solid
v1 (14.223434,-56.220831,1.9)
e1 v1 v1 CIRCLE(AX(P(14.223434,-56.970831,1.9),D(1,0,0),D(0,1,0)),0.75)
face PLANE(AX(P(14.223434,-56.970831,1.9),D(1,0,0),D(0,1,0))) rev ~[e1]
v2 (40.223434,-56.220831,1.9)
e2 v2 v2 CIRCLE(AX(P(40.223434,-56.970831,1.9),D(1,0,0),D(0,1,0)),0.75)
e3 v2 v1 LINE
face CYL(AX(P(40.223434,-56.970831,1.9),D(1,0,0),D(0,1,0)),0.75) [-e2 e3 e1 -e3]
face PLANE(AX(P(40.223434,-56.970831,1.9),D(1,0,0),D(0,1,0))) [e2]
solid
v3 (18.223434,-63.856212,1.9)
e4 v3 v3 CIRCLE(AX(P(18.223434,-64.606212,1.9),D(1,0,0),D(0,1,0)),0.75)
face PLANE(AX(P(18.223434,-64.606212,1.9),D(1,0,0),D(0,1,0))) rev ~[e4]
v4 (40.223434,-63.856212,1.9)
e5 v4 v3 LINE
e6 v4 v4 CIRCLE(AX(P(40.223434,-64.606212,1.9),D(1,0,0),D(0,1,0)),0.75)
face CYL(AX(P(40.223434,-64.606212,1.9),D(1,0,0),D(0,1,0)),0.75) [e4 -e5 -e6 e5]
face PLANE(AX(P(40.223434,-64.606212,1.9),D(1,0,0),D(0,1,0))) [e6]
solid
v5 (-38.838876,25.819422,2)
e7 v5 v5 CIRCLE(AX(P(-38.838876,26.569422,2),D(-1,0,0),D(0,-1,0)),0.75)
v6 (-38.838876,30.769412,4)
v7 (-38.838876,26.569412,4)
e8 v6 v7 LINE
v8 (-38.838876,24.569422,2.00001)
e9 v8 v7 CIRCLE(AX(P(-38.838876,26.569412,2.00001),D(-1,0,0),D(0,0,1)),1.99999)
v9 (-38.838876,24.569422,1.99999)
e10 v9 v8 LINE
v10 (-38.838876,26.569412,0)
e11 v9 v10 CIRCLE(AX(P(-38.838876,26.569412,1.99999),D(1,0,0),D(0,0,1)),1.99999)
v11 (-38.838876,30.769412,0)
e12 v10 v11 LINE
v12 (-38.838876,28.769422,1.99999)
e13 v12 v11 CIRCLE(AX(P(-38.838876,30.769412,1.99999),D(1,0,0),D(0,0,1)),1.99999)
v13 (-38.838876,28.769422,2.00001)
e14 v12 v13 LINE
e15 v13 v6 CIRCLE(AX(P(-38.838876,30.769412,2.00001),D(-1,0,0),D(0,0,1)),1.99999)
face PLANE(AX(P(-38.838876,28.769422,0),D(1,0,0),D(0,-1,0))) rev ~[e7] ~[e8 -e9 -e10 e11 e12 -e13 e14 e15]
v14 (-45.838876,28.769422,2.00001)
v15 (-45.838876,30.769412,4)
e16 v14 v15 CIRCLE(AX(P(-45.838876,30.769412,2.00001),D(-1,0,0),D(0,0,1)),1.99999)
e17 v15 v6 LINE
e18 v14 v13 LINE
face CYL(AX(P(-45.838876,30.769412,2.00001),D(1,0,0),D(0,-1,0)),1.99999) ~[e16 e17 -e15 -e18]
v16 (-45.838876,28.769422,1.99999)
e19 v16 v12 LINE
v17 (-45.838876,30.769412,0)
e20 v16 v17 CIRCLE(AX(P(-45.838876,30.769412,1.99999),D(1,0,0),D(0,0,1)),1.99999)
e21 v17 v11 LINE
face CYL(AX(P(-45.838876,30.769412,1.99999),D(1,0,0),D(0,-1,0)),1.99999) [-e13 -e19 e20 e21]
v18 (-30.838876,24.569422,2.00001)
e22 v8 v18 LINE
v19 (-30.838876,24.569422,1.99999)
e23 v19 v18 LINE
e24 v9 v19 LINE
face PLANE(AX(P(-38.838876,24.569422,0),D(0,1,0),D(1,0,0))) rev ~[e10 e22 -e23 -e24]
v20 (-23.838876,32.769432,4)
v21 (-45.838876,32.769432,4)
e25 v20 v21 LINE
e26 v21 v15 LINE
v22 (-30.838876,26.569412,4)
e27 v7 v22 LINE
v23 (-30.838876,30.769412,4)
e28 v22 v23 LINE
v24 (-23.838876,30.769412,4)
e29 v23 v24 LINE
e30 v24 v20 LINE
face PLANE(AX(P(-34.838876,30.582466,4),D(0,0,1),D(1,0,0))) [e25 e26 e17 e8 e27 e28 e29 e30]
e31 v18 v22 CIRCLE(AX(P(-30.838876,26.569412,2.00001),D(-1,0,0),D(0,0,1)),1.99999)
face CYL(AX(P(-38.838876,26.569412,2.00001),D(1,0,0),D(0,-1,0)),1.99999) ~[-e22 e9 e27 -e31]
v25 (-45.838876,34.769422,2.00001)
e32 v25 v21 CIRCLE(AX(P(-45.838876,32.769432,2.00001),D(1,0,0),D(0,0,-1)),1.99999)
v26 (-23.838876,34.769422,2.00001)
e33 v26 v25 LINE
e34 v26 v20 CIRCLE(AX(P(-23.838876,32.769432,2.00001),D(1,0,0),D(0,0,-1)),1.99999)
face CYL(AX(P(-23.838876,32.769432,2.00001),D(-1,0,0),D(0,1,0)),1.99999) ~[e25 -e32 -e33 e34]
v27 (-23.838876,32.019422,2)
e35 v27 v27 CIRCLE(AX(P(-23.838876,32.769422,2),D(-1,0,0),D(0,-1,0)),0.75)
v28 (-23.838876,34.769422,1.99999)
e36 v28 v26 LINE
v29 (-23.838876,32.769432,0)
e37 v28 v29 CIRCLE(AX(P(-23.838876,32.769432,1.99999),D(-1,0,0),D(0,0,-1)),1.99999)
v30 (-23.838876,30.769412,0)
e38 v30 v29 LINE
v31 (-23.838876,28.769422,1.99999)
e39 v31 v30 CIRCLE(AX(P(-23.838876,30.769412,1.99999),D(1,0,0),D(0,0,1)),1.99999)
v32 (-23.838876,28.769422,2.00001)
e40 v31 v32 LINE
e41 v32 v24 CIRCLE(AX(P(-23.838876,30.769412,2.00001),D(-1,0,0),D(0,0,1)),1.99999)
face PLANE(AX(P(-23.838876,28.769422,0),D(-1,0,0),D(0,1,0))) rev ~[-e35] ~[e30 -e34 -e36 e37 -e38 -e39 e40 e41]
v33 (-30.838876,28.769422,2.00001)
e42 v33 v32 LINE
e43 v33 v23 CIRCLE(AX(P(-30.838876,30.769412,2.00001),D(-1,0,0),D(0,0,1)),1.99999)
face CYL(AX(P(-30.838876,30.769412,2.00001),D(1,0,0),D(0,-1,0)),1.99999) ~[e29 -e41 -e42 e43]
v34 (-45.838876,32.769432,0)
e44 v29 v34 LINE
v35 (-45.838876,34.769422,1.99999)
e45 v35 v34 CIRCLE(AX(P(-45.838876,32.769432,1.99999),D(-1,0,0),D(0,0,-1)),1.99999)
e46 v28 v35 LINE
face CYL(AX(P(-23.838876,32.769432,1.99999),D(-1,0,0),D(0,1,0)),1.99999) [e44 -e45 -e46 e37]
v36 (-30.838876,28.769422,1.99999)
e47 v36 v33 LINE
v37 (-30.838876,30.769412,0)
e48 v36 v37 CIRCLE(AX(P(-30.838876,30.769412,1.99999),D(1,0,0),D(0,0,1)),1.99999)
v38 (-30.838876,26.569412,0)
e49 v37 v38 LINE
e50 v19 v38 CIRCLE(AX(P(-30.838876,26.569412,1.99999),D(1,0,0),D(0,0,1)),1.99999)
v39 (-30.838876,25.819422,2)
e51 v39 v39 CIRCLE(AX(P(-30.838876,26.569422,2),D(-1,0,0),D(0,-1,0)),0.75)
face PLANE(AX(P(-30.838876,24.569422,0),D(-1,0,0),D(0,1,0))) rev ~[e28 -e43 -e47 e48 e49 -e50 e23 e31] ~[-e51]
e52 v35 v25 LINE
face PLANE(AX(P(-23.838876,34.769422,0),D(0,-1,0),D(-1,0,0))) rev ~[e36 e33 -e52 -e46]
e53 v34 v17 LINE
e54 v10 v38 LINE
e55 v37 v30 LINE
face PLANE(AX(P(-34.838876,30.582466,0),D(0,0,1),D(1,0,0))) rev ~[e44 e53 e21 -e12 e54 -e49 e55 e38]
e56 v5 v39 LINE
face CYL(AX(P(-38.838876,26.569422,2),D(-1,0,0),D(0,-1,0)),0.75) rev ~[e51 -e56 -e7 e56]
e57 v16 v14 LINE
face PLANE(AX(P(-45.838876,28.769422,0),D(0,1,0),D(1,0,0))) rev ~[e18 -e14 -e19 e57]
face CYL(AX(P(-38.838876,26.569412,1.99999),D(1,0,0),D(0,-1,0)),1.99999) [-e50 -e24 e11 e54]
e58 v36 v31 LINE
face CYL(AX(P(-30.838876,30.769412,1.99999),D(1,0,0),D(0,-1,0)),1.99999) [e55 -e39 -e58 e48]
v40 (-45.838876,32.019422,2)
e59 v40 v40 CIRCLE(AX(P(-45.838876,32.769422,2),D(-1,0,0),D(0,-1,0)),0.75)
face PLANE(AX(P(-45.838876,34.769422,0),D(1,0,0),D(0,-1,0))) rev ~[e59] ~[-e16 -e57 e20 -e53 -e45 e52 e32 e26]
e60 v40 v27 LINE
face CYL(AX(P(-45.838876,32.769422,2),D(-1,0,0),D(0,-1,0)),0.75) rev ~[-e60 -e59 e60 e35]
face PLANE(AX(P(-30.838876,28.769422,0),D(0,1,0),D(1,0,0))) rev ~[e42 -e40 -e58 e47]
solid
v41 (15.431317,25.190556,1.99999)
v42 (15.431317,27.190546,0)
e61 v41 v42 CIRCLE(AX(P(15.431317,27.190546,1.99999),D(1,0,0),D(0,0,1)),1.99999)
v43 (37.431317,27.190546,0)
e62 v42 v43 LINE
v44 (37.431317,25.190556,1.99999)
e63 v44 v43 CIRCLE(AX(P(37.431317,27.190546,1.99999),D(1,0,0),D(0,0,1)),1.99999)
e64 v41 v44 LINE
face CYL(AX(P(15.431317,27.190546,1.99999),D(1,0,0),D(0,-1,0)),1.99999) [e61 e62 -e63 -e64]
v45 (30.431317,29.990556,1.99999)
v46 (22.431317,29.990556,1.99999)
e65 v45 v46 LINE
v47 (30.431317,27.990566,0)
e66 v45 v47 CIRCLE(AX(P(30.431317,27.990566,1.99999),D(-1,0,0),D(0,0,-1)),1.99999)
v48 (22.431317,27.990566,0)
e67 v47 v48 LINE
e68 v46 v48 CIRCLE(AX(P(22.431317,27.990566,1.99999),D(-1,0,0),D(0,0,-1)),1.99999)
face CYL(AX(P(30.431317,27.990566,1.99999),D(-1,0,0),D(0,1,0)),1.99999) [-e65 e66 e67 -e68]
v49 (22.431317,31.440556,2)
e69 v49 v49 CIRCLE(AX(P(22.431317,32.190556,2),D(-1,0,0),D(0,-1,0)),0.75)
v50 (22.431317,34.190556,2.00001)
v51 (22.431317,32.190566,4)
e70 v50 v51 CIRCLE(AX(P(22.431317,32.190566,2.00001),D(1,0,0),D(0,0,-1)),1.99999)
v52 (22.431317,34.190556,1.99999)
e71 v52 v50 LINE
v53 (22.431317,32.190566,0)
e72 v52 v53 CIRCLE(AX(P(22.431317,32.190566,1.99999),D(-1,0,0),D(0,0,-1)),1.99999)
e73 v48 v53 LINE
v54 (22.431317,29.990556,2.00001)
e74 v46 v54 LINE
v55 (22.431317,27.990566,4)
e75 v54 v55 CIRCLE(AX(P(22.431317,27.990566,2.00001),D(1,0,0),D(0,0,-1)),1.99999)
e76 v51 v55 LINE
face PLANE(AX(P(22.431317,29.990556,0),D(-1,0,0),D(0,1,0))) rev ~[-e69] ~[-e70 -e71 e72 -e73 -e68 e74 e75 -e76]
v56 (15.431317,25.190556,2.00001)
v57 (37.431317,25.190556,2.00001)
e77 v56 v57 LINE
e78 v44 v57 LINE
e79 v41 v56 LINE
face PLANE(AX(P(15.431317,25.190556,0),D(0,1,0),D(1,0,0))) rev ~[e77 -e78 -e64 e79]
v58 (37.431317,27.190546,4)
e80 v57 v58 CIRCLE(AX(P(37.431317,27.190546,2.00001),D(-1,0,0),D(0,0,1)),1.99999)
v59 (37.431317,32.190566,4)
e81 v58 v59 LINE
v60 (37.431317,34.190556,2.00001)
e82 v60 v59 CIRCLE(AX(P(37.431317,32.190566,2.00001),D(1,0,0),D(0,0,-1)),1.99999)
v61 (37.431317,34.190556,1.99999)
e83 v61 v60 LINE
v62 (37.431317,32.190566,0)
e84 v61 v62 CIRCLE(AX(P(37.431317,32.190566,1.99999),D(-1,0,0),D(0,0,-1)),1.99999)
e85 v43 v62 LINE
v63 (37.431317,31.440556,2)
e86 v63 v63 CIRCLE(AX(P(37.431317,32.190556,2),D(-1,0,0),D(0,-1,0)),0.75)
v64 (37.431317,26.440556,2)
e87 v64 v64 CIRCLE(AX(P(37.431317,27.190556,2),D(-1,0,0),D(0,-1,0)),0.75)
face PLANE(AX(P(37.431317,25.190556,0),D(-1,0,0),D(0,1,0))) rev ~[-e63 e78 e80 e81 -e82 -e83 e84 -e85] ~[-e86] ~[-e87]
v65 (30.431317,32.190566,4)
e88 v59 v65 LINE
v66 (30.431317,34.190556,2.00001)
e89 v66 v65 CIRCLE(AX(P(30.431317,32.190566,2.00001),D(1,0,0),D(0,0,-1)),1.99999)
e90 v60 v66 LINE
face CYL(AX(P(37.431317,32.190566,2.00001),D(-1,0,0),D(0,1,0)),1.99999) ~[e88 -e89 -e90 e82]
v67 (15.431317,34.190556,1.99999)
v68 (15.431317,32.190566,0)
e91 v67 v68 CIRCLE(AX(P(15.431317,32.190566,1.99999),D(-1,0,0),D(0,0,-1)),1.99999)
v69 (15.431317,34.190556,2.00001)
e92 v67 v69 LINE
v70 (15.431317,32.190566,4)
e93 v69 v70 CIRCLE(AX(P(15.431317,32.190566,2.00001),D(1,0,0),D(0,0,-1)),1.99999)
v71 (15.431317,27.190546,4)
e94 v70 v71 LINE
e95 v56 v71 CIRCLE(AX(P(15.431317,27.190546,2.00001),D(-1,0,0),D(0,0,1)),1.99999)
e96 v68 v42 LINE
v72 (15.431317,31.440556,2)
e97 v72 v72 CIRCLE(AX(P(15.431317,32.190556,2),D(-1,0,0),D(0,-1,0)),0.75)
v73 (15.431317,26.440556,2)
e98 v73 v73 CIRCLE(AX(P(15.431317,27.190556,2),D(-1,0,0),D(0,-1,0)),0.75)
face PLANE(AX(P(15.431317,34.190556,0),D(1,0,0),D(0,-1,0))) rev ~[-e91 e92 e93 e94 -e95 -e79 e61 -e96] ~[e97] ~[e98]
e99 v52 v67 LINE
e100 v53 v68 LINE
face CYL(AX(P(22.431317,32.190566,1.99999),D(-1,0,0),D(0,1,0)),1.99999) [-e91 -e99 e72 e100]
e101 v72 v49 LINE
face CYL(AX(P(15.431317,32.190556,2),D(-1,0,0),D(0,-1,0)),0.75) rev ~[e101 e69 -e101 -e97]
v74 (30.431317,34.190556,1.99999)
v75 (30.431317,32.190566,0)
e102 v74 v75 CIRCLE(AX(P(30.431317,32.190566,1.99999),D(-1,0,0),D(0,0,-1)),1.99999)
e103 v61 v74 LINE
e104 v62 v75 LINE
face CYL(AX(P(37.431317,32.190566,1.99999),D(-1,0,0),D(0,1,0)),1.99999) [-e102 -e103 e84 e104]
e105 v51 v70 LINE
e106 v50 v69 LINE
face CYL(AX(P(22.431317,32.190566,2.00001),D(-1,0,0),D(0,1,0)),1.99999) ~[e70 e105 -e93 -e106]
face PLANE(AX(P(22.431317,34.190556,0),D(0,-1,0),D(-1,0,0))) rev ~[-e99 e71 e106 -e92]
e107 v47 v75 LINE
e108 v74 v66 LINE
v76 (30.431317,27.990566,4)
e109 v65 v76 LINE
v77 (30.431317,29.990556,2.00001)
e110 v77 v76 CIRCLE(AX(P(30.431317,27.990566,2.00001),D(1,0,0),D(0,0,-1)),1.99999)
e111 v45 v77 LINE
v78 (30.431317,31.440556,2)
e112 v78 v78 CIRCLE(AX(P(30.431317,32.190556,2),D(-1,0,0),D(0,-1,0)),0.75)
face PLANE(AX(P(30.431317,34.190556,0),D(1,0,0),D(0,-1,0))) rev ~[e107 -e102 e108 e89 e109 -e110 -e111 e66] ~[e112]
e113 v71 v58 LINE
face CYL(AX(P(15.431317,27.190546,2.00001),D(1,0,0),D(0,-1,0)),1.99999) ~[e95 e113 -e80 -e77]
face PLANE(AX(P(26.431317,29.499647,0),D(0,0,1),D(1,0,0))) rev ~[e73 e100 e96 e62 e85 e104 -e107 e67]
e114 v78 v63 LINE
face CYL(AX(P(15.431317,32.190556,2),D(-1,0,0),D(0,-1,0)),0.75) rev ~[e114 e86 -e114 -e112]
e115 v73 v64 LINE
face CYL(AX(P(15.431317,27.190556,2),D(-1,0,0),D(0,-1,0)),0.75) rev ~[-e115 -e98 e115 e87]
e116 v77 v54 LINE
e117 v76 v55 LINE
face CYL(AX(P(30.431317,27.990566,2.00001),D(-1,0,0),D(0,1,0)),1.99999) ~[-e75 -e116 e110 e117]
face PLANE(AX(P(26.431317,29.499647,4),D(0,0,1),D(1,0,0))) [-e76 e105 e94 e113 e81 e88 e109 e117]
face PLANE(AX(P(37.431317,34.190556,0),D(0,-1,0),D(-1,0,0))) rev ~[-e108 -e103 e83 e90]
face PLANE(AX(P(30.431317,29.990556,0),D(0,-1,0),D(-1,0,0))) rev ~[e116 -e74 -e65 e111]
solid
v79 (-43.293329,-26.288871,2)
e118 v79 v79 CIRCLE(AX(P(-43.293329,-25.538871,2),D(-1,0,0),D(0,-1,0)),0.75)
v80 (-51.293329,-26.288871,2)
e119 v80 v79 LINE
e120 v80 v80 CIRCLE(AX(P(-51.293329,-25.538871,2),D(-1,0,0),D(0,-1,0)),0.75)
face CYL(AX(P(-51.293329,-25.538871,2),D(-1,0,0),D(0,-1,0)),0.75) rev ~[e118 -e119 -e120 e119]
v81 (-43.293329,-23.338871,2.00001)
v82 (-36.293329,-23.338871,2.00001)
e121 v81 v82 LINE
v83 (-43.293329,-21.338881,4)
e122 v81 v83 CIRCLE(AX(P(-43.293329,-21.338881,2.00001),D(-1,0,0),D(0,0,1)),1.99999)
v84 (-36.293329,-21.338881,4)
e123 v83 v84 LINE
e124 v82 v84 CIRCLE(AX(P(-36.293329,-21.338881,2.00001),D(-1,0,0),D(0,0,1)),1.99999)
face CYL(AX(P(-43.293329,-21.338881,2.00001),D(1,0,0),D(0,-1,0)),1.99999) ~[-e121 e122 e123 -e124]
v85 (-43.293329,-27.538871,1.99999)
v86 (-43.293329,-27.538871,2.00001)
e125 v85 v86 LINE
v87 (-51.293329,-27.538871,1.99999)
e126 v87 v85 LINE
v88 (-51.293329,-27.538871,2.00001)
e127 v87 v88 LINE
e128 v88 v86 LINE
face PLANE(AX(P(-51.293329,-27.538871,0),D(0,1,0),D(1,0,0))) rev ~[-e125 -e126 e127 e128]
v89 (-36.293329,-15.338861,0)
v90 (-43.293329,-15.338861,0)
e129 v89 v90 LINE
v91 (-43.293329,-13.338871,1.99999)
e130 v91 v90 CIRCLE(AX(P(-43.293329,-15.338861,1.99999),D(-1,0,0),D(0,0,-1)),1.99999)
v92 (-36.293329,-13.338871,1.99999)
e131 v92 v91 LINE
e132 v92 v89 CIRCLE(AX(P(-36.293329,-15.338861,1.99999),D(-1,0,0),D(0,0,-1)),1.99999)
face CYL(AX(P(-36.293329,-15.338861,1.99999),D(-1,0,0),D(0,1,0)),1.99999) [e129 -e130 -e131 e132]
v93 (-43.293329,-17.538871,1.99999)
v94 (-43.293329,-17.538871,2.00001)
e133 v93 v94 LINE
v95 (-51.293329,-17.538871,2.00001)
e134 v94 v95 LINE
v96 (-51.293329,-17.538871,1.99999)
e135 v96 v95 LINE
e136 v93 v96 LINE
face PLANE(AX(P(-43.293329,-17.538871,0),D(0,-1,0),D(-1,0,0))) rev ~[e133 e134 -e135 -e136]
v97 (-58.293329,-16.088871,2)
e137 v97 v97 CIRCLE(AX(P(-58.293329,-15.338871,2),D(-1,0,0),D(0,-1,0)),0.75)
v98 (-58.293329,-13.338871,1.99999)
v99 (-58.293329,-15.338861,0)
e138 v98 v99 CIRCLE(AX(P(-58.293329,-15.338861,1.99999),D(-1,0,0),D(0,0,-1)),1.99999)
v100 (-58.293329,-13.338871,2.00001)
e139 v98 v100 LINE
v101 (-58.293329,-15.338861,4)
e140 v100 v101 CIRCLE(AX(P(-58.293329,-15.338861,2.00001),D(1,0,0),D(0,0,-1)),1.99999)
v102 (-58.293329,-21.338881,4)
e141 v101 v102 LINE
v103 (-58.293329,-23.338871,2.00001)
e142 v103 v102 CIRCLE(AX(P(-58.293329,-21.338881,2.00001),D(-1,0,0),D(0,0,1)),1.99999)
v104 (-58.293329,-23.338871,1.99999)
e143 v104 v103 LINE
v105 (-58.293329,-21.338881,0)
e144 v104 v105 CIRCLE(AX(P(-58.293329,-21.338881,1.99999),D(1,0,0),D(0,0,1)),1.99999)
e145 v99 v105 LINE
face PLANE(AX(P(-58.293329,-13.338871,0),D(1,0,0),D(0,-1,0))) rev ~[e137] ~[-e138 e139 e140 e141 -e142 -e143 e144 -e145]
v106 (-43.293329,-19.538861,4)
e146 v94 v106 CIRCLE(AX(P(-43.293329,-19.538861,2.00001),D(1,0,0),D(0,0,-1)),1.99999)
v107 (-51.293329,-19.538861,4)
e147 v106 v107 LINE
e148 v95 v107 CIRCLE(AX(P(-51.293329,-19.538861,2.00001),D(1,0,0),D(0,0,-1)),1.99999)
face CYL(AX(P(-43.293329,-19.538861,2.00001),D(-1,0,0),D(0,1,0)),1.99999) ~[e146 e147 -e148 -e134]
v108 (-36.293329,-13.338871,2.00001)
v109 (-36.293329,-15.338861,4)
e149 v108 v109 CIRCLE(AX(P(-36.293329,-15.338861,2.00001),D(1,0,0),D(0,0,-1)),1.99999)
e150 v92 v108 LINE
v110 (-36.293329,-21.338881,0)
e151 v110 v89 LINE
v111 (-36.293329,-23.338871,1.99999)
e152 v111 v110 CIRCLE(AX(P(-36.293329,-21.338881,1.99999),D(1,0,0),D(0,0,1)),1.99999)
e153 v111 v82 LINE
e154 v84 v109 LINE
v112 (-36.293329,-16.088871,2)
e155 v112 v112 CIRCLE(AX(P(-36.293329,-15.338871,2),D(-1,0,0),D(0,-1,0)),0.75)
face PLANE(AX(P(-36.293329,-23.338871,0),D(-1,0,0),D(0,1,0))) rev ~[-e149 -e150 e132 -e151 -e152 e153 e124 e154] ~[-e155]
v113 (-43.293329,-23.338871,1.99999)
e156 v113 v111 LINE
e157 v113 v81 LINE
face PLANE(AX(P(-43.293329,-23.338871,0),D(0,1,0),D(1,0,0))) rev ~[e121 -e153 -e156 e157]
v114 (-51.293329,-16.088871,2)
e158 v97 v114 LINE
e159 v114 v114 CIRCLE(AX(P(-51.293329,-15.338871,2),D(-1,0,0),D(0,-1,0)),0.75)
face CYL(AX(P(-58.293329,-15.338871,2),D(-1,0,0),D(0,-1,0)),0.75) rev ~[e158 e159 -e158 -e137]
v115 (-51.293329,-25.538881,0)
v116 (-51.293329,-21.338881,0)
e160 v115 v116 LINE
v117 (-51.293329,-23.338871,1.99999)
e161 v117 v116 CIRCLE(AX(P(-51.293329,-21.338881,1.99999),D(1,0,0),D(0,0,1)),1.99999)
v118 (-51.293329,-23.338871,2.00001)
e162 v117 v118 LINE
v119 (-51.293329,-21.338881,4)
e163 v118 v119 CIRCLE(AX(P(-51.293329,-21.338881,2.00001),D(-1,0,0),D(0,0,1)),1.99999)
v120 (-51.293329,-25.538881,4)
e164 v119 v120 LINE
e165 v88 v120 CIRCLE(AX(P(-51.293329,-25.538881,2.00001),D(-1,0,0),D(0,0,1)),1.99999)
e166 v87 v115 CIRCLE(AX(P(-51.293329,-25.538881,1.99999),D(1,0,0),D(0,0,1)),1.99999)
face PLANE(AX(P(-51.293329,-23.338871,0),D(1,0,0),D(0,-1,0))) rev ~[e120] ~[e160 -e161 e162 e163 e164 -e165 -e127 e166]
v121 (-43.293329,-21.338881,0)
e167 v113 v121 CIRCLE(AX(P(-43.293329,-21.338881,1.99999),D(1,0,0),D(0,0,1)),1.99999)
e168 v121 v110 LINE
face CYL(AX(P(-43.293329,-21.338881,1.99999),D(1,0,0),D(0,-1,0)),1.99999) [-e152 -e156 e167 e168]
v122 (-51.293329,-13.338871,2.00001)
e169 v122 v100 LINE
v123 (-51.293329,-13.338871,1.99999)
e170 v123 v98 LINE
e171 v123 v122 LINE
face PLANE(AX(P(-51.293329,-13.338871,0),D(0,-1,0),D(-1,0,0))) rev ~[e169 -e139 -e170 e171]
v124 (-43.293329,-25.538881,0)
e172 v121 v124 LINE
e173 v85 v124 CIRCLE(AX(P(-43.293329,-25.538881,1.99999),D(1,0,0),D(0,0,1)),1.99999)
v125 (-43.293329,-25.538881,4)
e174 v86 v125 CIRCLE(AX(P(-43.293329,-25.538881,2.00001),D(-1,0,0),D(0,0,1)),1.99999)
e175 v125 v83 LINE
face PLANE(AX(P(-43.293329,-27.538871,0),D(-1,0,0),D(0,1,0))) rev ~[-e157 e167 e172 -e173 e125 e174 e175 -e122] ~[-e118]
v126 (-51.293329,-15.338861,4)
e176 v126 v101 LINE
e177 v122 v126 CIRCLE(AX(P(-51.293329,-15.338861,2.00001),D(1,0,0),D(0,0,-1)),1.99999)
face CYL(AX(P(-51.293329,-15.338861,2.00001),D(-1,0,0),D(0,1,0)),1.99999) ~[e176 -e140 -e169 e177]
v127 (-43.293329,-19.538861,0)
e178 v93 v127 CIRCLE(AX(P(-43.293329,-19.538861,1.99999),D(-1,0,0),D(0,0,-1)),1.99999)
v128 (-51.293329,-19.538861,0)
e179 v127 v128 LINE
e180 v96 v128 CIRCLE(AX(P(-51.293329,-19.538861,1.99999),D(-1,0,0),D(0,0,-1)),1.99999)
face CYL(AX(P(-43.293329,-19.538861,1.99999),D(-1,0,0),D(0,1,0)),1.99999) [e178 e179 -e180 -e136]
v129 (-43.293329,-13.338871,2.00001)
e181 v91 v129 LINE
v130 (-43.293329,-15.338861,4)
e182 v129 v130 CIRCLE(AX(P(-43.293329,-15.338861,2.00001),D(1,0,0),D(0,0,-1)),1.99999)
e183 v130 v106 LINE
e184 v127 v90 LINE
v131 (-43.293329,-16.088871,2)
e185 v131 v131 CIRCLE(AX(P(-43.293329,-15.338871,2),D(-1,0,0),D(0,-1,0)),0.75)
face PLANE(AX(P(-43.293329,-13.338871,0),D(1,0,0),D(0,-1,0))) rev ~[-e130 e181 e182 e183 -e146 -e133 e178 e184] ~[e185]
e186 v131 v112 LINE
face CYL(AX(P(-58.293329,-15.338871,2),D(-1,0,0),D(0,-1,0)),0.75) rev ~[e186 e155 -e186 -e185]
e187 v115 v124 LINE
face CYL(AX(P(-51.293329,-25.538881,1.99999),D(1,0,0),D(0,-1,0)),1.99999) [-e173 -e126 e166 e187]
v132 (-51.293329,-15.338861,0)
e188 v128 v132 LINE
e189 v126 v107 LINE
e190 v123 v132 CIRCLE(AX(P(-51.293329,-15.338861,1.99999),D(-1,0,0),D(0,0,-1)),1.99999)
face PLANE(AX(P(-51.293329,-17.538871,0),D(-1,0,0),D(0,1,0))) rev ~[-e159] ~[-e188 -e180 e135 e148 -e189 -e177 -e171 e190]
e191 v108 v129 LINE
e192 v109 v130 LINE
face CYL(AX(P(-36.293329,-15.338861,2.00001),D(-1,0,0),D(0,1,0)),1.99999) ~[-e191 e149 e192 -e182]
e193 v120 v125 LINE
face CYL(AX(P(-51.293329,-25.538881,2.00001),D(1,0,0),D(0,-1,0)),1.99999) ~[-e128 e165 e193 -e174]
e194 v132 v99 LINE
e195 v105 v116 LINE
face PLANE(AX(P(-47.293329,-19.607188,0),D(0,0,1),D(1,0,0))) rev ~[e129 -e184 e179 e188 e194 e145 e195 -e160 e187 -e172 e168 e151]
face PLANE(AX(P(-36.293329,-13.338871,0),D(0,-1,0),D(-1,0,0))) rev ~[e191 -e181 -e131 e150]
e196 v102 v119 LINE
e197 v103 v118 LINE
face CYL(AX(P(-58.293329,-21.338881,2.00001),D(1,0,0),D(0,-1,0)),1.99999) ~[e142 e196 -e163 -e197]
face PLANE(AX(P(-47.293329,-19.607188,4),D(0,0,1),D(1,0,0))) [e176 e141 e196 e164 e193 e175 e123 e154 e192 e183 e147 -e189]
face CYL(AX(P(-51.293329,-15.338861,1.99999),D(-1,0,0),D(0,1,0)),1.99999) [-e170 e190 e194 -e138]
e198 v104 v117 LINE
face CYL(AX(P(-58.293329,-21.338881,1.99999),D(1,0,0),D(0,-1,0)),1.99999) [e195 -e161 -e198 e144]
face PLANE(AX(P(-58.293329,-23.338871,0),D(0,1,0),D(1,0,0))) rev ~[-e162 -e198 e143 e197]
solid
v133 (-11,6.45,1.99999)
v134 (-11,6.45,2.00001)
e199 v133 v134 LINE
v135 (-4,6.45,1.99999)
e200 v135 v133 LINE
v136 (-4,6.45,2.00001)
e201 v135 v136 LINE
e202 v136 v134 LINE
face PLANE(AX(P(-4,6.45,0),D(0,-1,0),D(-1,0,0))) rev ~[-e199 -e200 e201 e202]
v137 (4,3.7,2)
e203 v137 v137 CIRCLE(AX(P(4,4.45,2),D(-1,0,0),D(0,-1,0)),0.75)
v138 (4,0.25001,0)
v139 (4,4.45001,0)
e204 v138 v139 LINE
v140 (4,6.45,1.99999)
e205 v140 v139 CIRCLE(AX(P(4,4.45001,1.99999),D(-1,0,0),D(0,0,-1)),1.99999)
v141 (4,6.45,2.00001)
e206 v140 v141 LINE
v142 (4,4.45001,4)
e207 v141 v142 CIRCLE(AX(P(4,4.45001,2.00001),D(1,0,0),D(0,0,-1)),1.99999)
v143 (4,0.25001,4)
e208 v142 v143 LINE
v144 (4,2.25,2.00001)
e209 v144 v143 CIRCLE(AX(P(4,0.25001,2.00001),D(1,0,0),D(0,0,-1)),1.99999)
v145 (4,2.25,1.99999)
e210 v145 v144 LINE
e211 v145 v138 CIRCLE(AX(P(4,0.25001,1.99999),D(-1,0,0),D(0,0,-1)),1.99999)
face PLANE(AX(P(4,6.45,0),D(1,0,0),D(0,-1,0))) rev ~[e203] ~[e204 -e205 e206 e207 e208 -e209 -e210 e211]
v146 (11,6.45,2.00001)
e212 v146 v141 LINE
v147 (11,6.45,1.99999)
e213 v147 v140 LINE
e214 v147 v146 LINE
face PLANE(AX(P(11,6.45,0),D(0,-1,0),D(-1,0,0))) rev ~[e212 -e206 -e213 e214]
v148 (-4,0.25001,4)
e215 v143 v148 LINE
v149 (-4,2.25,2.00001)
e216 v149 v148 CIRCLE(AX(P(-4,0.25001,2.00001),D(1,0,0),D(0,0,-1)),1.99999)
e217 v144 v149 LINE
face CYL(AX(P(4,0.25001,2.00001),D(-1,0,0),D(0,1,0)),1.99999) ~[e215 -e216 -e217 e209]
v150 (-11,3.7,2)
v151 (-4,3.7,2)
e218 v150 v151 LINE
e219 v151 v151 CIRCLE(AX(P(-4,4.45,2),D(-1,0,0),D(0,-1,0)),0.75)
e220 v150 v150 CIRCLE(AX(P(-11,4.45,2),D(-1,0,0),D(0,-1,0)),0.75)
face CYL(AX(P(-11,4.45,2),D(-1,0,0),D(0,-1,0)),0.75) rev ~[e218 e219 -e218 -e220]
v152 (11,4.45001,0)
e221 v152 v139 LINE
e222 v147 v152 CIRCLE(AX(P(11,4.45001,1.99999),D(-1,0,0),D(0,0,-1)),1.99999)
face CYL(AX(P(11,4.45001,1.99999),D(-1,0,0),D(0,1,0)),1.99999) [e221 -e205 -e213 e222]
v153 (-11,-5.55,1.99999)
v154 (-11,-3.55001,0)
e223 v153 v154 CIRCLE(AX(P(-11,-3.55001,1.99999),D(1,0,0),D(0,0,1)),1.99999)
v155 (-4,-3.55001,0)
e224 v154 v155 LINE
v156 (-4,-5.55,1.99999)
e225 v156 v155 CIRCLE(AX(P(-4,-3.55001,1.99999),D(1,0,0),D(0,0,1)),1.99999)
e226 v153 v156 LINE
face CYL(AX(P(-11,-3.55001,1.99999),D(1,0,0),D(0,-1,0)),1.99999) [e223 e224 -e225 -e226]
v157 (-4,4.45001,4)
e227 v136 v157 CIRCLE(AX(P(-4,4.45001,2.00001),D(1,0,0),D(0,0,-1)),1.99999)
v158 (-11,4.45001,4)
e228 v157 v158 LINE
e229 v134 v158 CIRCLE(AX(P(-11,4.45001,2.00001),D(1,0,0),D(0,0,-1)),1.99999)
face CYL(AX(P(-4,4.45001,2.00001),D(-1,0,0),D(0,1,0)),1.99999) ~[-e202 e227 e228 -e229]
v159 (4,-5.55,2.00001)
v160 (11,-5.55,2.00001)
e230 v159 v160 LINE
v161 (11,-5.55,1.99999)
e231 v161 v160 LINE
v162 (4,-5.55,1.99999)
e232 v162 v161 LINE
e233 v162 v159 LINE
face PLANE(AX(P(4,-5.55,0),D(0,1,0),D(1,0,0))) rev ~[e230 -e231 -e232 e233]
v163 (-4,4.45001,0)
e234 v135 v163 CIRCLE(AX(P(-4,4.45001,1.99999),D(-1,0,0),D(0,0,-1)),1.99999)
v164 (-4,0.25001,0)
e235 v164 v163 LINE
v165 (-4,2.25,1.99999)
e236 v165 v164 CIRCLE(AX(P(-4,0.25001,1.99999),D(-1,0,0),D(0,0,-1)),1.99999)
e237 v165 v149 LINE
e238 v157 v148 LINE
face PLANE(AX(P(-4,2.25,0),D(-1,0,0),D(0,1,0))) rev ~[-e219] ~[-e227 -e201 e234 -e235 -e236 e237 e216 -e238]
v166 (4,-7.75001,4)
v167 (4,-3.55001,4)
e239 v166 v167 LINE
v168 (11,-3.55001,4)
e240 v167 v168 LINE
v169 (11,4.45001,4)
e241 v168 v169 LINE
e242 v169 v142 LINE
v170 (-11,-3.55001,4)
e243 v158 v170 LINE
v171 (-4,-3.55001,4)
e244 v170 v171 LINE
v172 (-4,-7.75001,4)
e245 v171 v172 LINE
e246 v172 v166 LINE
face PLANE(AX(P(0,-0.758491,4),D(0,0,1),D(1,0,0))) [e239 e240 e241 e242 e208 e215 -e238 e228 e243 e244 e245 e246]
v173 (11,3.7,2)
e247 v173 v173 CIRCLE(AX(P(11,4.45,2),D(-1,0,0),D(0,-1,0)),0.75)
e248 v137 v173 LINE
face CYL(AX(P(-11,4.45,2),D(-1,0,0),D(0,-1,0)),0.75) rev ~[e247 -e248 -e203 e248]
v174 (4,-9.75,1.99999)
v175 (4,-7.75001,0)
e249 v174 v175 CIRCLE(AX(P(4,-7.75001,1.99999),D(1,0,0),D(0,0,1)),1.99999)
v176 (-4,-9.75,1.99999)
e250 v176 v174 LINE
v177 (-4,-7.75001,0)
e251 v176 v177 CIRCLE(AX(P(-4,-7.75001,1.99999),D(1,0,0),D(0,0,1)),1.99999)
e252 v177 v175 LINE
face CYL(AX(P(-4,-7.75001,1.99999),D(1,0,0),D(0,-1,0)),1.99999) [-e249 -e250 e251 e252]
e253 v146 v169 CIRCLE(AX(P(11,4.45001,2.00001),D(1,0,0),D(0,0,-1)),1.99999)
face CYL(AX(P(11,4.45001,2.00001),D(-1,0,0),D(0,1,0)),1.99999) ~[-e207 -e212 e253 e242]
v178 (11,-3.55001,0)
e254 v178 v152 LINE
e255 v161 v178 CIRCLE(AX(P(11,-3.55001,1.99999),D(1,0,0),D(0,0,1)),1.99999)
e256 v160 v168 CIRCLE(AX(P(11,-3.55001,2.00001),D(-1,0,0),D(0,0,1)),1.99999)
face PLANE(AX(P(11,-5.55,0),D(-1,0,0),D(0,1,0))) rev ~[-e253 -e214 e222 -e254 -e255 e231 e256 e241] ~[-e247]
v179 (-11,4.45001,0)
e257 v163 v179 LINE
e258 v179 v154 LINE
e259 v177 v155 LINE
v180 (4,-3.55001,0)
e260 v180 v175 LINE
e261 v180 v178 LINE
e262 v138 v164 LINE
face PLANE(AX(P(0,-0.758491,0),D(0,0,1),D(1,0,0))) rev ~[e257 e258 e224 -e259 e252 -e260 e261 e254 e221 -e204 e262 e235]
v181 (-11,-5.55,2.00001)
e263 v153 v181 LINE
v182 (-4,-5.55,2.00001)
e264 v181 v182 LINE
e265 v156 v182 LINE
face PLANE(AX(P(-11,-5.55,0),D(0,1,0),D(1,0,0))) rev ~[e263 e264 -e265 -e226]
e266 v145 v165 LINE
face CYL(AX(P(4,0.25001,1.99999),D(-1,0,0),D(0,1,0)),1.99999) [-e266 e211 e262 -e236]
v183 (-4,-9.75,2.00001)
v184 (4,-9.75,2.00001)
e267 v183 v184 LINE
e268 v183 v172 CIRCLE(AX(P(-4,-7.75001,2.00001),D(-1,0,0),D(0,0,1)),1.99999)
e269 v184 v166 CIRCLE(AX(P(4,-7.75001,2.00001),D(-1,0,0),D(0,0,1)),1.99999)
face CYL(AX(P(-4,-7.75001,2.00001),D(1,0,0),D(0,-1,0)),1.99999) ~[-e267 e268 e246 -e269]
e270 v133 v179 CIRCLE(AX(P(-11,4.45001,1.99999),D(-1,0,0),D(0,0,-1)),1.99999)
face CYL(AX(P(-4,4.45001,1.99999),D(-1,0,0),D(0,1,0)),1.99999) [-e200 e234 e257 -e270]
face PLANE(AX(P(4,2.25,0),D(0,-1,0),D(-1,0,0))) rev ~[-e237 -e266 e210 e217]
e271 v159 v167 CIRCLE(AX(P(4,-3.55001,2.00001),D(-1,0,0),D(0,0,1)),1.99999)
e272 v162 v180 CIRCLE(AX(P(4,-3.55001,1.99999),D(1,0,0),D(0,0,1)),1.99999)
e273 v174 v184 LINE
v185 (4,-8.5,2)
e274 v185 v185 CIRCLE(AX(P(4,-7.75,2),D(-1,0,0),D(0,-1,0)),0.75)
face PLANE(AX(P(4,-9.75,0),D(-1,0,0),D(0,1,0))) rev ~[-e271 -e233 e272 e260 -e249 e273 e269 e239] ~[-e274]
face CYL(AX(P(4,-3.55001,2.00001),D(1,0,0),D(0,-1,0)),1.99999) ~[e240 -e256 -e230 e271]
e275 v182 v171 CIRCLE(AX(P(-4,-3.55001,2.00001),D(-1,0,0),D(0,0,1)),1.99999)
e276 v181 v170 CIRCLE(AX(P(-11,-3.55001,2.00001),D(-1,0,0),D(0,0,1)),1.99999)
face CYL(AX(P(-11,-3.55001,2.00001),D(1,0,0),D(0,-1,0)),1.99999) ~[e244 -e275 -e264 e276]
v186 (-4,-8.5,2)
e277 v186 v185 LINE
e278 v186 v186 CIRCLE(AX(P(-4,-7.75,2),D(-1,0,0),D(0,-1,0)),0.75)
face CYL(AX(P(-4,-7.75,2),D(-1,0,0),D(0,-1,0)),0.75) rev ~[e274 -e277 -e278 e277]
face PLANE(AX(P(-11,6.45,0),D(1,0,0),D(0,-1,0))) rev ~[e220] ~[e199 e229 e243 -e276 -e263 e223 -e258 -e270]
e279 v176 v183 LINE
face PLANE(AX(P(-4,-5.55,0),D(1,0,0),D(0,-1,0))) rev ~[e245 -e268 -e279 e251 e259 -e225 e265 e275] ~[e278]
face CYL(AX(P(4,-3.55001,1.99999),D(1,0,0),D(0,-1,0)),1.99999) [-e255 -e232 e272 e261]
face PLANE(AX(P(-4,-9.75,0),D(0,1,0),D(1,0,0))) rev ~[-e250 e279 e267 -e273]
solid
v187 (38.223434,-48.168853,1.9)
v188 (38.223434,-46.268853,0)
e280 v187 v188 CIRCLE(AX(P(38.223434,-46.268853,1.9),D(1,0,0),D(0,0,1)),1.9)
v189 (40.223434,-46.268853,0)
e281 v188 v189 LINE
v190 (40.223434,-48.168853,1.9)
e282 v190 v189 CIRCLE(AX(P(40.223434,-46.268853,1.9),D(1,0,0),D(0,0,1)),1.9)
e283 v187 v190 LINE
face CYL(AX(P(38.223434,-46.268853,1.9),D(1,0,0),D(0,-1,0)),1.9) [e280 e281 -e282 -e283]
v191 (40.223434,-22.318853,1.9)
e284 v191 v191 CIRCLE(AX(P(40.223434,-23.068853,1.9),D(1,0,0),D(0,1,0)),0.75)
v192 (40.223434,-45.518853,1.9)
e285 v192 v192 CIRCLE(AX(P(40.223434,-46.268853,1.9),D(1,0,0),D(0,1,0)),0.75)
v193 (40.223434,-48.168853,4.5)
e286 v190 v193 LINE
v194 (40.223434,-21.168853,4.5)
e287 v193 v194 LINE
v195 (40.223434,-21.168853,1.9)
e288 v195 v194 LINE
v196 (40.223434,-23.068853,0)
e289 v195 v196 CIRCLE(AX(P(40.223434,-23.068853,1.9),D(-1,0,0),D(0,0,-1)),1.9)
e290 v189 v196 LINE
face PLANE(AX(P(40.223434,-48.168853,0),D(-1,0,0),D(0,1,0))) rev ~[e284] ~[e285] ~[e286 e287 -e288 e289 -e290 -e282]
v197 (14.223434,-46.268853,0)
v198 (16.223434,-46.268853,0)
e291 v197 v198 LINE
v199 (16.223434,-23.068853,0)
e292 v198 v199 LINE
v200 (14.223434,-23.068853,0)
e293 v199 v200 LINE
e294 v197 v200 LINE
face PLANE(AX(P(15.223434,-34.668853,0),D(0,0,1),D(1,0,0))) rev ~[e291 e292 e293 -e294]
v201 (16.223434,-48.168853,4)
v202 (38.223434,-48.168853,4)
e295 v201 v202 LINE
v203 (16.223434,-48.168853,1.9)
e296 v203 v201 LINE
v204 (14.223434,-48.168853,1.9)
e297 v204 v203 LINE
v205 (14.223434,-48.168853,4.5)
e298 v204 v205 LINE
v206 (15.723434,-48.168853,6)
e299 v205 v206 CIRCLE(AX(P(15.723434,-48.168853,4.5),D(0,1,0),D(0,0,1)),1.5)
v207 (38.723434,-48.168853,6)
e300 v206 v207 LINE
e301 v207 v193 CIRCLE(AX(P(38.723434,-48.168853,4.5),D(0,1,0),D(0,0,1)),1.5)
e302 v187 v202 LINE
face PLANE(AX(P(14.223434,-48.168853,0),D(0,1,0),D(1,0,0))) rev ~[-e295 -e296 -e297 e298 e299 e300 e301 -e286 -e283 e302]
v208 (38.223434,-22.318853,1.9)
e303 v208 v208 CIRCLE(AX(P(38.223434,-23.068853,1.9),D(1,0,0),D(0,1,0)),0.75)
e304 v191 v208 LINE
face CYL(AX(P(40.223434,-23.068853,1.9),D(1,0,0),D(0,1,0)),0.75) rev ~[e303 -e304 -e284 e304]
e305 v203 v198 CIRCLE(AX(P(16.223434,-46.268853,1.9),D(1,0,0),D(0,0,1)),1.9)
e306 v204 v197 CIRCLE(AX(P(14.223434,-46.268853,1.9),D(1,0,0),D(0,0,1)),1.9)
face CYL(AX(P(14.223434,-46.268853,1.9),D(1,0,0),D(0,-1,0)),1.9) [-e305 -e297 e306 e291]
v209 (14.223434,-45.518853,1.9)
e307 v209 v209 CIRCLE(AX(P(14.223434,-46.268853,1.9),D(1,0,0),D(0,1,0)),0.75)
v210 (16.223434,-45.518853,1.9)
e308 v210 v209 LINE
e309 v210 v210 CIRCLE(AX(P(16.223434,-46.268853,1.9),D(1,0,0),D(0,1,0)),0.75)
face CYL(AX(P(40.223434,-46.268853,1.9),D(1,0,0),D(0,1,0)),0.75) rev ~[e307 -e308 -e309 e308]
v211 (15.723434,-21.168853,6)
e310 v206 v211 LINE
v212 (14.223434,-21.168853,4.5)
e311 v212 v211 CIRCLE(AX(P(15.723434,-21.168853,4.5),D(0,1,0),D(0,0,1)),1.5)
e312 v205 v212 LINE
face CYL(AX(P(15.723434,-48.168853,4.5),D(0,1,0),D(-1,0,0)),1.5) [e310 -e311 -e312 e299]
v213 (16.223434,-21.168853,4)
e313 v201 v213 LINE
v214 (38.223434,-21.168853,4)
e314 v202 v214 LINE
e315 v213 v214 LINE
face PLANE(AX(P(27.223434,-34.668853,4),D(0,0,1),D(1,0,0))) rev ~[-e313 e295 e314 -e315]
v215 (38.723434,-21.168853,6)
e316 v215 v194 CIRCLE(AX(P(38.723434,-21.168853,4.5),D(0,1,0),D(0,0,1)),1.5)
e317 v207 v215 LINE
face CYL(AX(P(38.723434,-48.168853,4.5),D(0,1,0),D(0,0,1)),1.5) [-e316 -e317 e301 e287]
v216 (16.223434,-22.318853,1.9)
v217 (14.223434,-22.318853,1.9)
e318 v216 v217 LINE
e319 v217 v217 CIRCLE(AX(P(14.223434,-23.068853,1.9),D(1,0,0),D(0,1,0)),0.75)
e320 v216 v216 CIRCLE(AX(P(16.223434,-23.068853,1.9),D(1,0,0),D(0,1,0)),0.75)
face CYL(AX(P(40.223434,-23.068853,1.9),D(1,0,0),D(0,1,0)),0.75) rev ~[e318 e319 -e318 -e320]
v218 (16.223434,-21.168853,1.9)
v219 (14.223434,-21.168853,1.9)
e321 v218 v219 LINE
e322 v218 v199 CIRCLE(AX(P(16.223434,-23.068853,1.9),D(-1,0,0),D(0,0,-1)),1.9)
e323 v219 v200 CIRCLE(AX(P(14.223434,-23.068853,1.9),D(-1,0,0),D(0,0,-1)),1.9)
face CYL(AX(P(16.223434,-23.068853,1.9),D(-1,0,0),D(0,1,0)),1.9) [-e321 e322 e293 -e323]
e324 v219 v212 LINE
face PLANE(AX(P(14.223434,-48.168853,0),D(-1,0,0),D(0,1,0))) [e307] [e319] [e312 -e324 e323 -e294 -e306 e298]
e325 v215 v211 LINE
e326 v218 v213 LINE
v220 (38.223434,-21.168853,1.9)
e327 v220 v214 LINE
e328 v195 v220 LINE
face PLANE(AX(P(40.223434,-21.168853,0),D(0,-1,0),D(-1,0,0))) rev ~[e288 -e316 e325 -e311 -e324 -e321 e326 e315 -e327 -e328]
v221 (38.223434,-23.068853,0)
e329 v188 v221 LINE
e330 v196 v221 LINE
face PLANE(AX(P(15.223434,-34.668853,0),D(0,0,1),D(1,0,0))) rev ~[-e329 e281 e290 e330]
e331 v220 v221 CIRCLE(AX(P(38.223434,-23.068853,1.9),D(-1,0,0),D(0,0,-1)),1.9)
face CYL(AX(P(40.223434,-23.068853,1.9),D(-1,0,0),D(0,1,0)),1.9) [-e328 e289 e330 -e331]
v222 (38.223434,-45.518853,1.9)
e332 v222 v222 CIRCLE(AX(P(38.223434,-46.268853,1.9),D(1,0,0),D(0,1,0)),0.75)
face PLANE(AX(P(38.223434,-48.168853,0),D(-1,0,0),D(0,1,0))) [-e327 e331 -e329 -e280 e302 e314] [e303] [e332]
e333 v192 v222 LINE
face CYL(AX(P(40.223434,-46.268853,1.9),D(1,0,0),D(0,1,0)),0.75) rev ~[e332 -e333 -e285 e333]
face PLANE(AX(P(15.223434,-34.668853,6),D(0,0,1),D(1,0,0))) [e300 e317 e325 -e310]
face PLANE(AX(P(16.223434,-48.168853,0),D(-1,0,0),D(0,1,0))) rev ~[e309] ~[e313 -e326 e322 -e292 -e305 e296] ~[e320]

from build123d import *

# Parameters (mm, degrees)
F1_DEPTH  = 4
F2_R      = 1.99999
F2_2_R    = 1.99999
F2_3_R    = 1.99999
F2_4_R    = 1.99999
F3_R      = 0.75
F4_DEPTH  = 22
F5_R      = 0.75
F6_DEPTH  = 10
F7_R      = 0.75
F8_DEPTH  = 22
F9_R      = 0.75
F10_DEPTH = 22
F11_R     = 0.75
F12_DEPTH = 10
F13_R     = 0.75
F14_DEPTH = 22
F15_R     = 0.75
F16_DEPTH = 10
F0_W      = 2
F0_H      = 27
F0_W_2    = 22
F17_DEPTH = 6
F18_DEPTH = 4
F19_R     = 1.9
F20_R     = 0.75
F21_DEPTH = 26
F22_DEPTH = 26
F23_DEPTH = 22
F24_R     = 1.5


# Not quite as in the source:
# - a fillet or chamfer is up to 0.001 mm smaller than in the source, because OpenCascade refuses the exact size


with BuildPart() as f1:
    # F0 (on Top) → F1 (new body)
    with BuildSketch(Plane.XY):
        Polygon((-38.8388755443, 34.7694223676), (-45.8388755443, 34.7694223676), (-45.8388755443, 28.7694223676), (-38.8388755443, 28.7694223676), (-38.8388755443, 24.5694223676), (-34.8388755443, 24.5694223676), (-30.8388755443, 24.5694223676), (-30.8388755443, 28.7694223676), (-23.8388755443, 28.7694223676), (-23.8388755443, 34.7694223676), (-30.8388755443, 34.7694223676), align=None)
    extrude(amount=F1_DEPTH)

    # F2 (radius 2 in the source; OpenCascade refuses exactly that, so slightly less here)
    f2_edges = [f1.edges().sort_by_distance(p)[0] for p in [
        (-34.838876, 34.769422, 4),
        (-42.338876, 28.769422, 4),
        (-42.338876, 28.769422, 0),
        (-27.338876, 28.769422, 4),
        (-27.338876, 28.769422, 0),
        (-34.838876, 34.769422, 0),
        (-34.838876, 24.569422, 0),
        (-34.838876, 24.569422, 4),
    ]]
    fillet(f2_edges, radius=F2_R)

    # F3 (on face) → F4 (cut)
    with BuildSketch(Plane(origin=(-45.8388755443, 0, 0), x_dir=(0, -1, 0), z_dir=(-1, 0, 0))):
        with Locations((-32.7694223676, 2)):
            Circle(F3_R)
    extrude(amount=-F4_DEPTH, mode=Mode.SUBTRACT)

    # F5 (on face) → F6 (cut)
    with BuildSketch(Plane(origin=(-38.8388755443, 0, 0), x_dir=(0, -1, 0), z_dir=(-1, 0, 0))):
        with Locations((-26.5694223676, 2)):
            Circle(F5_R)
    extrude(amount=-F6_DEPTH, mode=Mode.SUBTRACT)


with BuildPart() as f1b:
    # F0 (on Top) → F1, piece 2 (new body)
    with BuildSketch(Plane.XY):
        Polygon((22.4313167212, 34.190556467), (15.4313167212, 34.190556467), (15.4313167212, 25.190556467), (22.4313167212, 25.190556467), (30.4313167212, 25.190556467), (37.4313167212, 25.190556467), (37.4313167212, 34.190556467), (30.4313167212, 34.190556467), (30.4313167212, 29.990556467), (26.4313167212, 29.990556467), (22.4313167212, 29.990556467), align=None)
    extrude(amount=F1_DEPTH)

    # F2#2 (radius 2 in the source; OpenCascade refuses exactly that, so slightly less here)
    f2_2_edges = [f1b.edges().sort_by_distance(p)[0] for p in [
        (18.931317, 34.190556, 4),
        (33.931317, 34.190556, 4),
        (26.431317, 25.190556, 4),
        (26.431317, 25.190556, 0),
        (18.931317, 34.190556, 0),
        (33.931317, 34.190556, 0),
        (26.431317, 29.990556, 0),
        (26.431317, 29.990556, 4),
    ]]
    fillet(f2_2_edges, radius=F2_2_R)

    # F7 (on face) → F8 (cut)
    with BuildSketch(Plane(origin=(15.4313167212, 0, 0), x_dir=(0, -1, 0), z_dir=(-1, 0, 0))):
        with Locations((-32.190556467, 2)):
            Circle(F7_R)
        with Locations((-27.190556467, 2)):
            Circle(F7_R)
    extrude(amount=-F8_DEPTH, mode=Mode.SUBTRACT)


with BuildPart() as f1c:
    # F0 (on Top) → F1, piece 3 (new body)
    with BuildSketch(Plane.XY):
        Polygon((-4, 6.45), (-11, 6.45), (-11, -5.55), (-4, -5.55), (-4, -9.75), (0, -9.75), (4, -9.75), (4, -5.55), (11, -5.55), (11, 6.45), (4, 6.45), (4, 2.25), (0, 2.25), (-4, 2.25), align=None)
    extrude(amount=F1_DEPTH)

    # F2#3 (radius 2 in the source; OpenCascade refuses exactly that, so slightly less here)
    f2_3_edges = [f1c.edges().sort_by_distance(p)[0] for p in [
        (-7.5, 6.45, 4),
        (7.5, 6.45, 4),
        (7.5, -5.55, 4),
        (-7.5, -5.55, 4),
        (7.5, 6.45, 0),
        (-7.5, 6.45, 0),
        (-7.5, -5.55, 0),
        (7.5, -5.55, 0),
        (0, 2.25, 0),
        (0, -9.75, 0),
        (0, 2.25, 4),
        (0, -9.75, 4),
    ]]
    fillet(f2_3_edges, radius=F2_3_R)

    # F9 (on face) → F10 (cut)
    with BuildSketch(Plane(origin=(-11, 0, 0), x_dir=(0, -1, 0), z_dir=(-1, 0, 0))):
        with Locations((-4.45, 2)):
            Circle(F9_R)
    extrude(amount=-F10_DEPTH, mode=Mode.SUBTRACT)

    # F11 (on face) → F12 (cut)
    with BuildSketch(Plane(origin=(-4, 0, 0), x_dir=(0, -1, 0), z_dir=(-1, 0, 0))):
        with Locations((7.75, 2)):
            Circle(F11_R)
    extrude(amount=-F12_DEPTH, mode=Mode.SUBTRACT)


with BuildPart() as f1d:
    # F0 (on Top) → F1, piece 4 (new body)
    with BuildSketch(Plane.XY):
        Polygon((-51.2933294001, -13.3388710316), (-58.2933294001, -13.3388710316), (-58.2933294001, -23.3388710316), (-51.2933294001, -23.3388710316), (-51.2933294001, -27.5388710316), (-47.2933294001, -27.5388710316), (-43.2933294001, -27.5388710316), (-43.2933294001, -23.3388710316), (-36.2933294001, -23.3388710316), (-36.2933294001, -13.3388710316), (-43.2933294001, -13.3388710316), (-43.2933294001, -17.5388710316), (-47.2933294001, -17.5388710316), (-51.2933294001, -17.5388710316), align=None)
    extrude(amount=F1_DEPTH)

    # F2#4 (radius 2 in the source; OpenCascade refuses exactly that, so slightly less here)
    f2_4_edges = [f1d.edges().sort_by_distance(p)[0] for p in [
        (-54.793329, -13.338871, 4),
        (-39.793329, -13.338871, 4),
        (-54.793329, -23.338871, 4),
        (-39.793329, -23.338871, 4),
        (-54.793329, -13.338871, 0),
        (-39.793329, -13.338871, 0),
        (-39.793329, -23.338871, 0),
        (-54.793329, -23.338871, 0),
        (-47.293329, -27.538871, 0),
        (-47.293329, -17.538871, 0),
        (-47.293329, -27.538871, 4),
        (-47.293329, -17.538871, 4),
    ]]
    fillet(f2_4_edges, radius=F2_4_R)

    # F13 (on face) → F14 (cut)
    with BuildSketch(Plane(origin=(-58.2933294001, 0, 0), x_dir=(0, -1, 0), z_dir=(-1, 0, 0))):
        with Locations((15.3388710316, 2)):
            Circle(F13_R)
    extrude(amount=-F14_DEPTH, mode=Mode.SUBTRACT)

    # F15 (on face) → F16 (cut)
    with BuildSketch(Plane(origin=(-51.2933294001, 0, 0), x_dir=(0, -1, 0), z_dir=(-1, 0, 0))):
        with Locations((25.5388710316, 2)):
            Circle(F15_R)
    extrude(amount=-F16_DEPTH, mode=Mode.SUBTRACT)


with BuildPart() as f17:
    # F0 (on Top) → F17 (new body)
    with BuildSketch(Plane.XY):
        with Locations((15.223434031, -34.6688529253)):
            Rectangle(F0_W, F0_H)
        with Locations((27.223434031, -34.6688529253)):
            Rectangle(F0_W_2, F0_H)
        with Locations((39.223434031, -34.6688529253)):
            Rectangle(F0_W, F0_H)
    extrude(amount=F17_DEPTH)

    # F0 (on Top) → F18 (cut)
    with BuildSketch(Plane.XY):
        with Locations((27.223434031, -34.6688529253)):
            Rectangle(F0_W_2, F0_H)
    extrude(amount=F18_DEPTH, mode=Mode.SUBTRACT)

    # F19
    f19_edges = [f17.edges().sort_by_distance(p)[0] for p in [
        (39.223434, -48.168853, 0),
        (39.223434, -21.168853, 0),
        (15.223434, -48.168853, 0),
        (15.223434, -21.168853, 0),
    ]]
    fillet(f19_edges, radius=F19_R)

    # F20 (on face) → F21 (cut)
    with BuildSketch(Plane.YZ.offset(40.223434031)):
        with Locations((-46.2688529253, 1.9)):
            Circle(F20_R)
        with Locations((-23.0688529253, 1.9)):
            Circle(F20_R)
    extrude(amount=-F21_DEPTH, mode=Mode.SUBTRACT)

    # F24
    f24_edges = [f17.edges().sort_by_distance(p)[0] for p in [
        (40.223434, -34.668853, 6),
        (14.223434, -34.668853, 6),
    ]]
    fillet(f24_edges, radius=F24_R)


with BuildPart() as f22:
    # F20 (on face) → F22 (new body)
    with BuildSketch(Plane.YZ.offset(40.223434031)):
        with Locations((-56.9708310068, 1.9)):
            Circle(F20_R)
    extrude(amount=-F22_DEPTH)


with BuildPart() as f23:
    # F20 (on face) → F23 (new body)
    with BuildSketch(Plane.YZ.offset(40.223434031)):
        with Locations((-64.6062120795, 1.9)):
            Circle(F20_R)
    extrude(amount=-F23_DEPTH)


solid = Compound([f1.part, f1b.part, f1c.part, f1d.part, f17.part, f22.part, f23.part])
